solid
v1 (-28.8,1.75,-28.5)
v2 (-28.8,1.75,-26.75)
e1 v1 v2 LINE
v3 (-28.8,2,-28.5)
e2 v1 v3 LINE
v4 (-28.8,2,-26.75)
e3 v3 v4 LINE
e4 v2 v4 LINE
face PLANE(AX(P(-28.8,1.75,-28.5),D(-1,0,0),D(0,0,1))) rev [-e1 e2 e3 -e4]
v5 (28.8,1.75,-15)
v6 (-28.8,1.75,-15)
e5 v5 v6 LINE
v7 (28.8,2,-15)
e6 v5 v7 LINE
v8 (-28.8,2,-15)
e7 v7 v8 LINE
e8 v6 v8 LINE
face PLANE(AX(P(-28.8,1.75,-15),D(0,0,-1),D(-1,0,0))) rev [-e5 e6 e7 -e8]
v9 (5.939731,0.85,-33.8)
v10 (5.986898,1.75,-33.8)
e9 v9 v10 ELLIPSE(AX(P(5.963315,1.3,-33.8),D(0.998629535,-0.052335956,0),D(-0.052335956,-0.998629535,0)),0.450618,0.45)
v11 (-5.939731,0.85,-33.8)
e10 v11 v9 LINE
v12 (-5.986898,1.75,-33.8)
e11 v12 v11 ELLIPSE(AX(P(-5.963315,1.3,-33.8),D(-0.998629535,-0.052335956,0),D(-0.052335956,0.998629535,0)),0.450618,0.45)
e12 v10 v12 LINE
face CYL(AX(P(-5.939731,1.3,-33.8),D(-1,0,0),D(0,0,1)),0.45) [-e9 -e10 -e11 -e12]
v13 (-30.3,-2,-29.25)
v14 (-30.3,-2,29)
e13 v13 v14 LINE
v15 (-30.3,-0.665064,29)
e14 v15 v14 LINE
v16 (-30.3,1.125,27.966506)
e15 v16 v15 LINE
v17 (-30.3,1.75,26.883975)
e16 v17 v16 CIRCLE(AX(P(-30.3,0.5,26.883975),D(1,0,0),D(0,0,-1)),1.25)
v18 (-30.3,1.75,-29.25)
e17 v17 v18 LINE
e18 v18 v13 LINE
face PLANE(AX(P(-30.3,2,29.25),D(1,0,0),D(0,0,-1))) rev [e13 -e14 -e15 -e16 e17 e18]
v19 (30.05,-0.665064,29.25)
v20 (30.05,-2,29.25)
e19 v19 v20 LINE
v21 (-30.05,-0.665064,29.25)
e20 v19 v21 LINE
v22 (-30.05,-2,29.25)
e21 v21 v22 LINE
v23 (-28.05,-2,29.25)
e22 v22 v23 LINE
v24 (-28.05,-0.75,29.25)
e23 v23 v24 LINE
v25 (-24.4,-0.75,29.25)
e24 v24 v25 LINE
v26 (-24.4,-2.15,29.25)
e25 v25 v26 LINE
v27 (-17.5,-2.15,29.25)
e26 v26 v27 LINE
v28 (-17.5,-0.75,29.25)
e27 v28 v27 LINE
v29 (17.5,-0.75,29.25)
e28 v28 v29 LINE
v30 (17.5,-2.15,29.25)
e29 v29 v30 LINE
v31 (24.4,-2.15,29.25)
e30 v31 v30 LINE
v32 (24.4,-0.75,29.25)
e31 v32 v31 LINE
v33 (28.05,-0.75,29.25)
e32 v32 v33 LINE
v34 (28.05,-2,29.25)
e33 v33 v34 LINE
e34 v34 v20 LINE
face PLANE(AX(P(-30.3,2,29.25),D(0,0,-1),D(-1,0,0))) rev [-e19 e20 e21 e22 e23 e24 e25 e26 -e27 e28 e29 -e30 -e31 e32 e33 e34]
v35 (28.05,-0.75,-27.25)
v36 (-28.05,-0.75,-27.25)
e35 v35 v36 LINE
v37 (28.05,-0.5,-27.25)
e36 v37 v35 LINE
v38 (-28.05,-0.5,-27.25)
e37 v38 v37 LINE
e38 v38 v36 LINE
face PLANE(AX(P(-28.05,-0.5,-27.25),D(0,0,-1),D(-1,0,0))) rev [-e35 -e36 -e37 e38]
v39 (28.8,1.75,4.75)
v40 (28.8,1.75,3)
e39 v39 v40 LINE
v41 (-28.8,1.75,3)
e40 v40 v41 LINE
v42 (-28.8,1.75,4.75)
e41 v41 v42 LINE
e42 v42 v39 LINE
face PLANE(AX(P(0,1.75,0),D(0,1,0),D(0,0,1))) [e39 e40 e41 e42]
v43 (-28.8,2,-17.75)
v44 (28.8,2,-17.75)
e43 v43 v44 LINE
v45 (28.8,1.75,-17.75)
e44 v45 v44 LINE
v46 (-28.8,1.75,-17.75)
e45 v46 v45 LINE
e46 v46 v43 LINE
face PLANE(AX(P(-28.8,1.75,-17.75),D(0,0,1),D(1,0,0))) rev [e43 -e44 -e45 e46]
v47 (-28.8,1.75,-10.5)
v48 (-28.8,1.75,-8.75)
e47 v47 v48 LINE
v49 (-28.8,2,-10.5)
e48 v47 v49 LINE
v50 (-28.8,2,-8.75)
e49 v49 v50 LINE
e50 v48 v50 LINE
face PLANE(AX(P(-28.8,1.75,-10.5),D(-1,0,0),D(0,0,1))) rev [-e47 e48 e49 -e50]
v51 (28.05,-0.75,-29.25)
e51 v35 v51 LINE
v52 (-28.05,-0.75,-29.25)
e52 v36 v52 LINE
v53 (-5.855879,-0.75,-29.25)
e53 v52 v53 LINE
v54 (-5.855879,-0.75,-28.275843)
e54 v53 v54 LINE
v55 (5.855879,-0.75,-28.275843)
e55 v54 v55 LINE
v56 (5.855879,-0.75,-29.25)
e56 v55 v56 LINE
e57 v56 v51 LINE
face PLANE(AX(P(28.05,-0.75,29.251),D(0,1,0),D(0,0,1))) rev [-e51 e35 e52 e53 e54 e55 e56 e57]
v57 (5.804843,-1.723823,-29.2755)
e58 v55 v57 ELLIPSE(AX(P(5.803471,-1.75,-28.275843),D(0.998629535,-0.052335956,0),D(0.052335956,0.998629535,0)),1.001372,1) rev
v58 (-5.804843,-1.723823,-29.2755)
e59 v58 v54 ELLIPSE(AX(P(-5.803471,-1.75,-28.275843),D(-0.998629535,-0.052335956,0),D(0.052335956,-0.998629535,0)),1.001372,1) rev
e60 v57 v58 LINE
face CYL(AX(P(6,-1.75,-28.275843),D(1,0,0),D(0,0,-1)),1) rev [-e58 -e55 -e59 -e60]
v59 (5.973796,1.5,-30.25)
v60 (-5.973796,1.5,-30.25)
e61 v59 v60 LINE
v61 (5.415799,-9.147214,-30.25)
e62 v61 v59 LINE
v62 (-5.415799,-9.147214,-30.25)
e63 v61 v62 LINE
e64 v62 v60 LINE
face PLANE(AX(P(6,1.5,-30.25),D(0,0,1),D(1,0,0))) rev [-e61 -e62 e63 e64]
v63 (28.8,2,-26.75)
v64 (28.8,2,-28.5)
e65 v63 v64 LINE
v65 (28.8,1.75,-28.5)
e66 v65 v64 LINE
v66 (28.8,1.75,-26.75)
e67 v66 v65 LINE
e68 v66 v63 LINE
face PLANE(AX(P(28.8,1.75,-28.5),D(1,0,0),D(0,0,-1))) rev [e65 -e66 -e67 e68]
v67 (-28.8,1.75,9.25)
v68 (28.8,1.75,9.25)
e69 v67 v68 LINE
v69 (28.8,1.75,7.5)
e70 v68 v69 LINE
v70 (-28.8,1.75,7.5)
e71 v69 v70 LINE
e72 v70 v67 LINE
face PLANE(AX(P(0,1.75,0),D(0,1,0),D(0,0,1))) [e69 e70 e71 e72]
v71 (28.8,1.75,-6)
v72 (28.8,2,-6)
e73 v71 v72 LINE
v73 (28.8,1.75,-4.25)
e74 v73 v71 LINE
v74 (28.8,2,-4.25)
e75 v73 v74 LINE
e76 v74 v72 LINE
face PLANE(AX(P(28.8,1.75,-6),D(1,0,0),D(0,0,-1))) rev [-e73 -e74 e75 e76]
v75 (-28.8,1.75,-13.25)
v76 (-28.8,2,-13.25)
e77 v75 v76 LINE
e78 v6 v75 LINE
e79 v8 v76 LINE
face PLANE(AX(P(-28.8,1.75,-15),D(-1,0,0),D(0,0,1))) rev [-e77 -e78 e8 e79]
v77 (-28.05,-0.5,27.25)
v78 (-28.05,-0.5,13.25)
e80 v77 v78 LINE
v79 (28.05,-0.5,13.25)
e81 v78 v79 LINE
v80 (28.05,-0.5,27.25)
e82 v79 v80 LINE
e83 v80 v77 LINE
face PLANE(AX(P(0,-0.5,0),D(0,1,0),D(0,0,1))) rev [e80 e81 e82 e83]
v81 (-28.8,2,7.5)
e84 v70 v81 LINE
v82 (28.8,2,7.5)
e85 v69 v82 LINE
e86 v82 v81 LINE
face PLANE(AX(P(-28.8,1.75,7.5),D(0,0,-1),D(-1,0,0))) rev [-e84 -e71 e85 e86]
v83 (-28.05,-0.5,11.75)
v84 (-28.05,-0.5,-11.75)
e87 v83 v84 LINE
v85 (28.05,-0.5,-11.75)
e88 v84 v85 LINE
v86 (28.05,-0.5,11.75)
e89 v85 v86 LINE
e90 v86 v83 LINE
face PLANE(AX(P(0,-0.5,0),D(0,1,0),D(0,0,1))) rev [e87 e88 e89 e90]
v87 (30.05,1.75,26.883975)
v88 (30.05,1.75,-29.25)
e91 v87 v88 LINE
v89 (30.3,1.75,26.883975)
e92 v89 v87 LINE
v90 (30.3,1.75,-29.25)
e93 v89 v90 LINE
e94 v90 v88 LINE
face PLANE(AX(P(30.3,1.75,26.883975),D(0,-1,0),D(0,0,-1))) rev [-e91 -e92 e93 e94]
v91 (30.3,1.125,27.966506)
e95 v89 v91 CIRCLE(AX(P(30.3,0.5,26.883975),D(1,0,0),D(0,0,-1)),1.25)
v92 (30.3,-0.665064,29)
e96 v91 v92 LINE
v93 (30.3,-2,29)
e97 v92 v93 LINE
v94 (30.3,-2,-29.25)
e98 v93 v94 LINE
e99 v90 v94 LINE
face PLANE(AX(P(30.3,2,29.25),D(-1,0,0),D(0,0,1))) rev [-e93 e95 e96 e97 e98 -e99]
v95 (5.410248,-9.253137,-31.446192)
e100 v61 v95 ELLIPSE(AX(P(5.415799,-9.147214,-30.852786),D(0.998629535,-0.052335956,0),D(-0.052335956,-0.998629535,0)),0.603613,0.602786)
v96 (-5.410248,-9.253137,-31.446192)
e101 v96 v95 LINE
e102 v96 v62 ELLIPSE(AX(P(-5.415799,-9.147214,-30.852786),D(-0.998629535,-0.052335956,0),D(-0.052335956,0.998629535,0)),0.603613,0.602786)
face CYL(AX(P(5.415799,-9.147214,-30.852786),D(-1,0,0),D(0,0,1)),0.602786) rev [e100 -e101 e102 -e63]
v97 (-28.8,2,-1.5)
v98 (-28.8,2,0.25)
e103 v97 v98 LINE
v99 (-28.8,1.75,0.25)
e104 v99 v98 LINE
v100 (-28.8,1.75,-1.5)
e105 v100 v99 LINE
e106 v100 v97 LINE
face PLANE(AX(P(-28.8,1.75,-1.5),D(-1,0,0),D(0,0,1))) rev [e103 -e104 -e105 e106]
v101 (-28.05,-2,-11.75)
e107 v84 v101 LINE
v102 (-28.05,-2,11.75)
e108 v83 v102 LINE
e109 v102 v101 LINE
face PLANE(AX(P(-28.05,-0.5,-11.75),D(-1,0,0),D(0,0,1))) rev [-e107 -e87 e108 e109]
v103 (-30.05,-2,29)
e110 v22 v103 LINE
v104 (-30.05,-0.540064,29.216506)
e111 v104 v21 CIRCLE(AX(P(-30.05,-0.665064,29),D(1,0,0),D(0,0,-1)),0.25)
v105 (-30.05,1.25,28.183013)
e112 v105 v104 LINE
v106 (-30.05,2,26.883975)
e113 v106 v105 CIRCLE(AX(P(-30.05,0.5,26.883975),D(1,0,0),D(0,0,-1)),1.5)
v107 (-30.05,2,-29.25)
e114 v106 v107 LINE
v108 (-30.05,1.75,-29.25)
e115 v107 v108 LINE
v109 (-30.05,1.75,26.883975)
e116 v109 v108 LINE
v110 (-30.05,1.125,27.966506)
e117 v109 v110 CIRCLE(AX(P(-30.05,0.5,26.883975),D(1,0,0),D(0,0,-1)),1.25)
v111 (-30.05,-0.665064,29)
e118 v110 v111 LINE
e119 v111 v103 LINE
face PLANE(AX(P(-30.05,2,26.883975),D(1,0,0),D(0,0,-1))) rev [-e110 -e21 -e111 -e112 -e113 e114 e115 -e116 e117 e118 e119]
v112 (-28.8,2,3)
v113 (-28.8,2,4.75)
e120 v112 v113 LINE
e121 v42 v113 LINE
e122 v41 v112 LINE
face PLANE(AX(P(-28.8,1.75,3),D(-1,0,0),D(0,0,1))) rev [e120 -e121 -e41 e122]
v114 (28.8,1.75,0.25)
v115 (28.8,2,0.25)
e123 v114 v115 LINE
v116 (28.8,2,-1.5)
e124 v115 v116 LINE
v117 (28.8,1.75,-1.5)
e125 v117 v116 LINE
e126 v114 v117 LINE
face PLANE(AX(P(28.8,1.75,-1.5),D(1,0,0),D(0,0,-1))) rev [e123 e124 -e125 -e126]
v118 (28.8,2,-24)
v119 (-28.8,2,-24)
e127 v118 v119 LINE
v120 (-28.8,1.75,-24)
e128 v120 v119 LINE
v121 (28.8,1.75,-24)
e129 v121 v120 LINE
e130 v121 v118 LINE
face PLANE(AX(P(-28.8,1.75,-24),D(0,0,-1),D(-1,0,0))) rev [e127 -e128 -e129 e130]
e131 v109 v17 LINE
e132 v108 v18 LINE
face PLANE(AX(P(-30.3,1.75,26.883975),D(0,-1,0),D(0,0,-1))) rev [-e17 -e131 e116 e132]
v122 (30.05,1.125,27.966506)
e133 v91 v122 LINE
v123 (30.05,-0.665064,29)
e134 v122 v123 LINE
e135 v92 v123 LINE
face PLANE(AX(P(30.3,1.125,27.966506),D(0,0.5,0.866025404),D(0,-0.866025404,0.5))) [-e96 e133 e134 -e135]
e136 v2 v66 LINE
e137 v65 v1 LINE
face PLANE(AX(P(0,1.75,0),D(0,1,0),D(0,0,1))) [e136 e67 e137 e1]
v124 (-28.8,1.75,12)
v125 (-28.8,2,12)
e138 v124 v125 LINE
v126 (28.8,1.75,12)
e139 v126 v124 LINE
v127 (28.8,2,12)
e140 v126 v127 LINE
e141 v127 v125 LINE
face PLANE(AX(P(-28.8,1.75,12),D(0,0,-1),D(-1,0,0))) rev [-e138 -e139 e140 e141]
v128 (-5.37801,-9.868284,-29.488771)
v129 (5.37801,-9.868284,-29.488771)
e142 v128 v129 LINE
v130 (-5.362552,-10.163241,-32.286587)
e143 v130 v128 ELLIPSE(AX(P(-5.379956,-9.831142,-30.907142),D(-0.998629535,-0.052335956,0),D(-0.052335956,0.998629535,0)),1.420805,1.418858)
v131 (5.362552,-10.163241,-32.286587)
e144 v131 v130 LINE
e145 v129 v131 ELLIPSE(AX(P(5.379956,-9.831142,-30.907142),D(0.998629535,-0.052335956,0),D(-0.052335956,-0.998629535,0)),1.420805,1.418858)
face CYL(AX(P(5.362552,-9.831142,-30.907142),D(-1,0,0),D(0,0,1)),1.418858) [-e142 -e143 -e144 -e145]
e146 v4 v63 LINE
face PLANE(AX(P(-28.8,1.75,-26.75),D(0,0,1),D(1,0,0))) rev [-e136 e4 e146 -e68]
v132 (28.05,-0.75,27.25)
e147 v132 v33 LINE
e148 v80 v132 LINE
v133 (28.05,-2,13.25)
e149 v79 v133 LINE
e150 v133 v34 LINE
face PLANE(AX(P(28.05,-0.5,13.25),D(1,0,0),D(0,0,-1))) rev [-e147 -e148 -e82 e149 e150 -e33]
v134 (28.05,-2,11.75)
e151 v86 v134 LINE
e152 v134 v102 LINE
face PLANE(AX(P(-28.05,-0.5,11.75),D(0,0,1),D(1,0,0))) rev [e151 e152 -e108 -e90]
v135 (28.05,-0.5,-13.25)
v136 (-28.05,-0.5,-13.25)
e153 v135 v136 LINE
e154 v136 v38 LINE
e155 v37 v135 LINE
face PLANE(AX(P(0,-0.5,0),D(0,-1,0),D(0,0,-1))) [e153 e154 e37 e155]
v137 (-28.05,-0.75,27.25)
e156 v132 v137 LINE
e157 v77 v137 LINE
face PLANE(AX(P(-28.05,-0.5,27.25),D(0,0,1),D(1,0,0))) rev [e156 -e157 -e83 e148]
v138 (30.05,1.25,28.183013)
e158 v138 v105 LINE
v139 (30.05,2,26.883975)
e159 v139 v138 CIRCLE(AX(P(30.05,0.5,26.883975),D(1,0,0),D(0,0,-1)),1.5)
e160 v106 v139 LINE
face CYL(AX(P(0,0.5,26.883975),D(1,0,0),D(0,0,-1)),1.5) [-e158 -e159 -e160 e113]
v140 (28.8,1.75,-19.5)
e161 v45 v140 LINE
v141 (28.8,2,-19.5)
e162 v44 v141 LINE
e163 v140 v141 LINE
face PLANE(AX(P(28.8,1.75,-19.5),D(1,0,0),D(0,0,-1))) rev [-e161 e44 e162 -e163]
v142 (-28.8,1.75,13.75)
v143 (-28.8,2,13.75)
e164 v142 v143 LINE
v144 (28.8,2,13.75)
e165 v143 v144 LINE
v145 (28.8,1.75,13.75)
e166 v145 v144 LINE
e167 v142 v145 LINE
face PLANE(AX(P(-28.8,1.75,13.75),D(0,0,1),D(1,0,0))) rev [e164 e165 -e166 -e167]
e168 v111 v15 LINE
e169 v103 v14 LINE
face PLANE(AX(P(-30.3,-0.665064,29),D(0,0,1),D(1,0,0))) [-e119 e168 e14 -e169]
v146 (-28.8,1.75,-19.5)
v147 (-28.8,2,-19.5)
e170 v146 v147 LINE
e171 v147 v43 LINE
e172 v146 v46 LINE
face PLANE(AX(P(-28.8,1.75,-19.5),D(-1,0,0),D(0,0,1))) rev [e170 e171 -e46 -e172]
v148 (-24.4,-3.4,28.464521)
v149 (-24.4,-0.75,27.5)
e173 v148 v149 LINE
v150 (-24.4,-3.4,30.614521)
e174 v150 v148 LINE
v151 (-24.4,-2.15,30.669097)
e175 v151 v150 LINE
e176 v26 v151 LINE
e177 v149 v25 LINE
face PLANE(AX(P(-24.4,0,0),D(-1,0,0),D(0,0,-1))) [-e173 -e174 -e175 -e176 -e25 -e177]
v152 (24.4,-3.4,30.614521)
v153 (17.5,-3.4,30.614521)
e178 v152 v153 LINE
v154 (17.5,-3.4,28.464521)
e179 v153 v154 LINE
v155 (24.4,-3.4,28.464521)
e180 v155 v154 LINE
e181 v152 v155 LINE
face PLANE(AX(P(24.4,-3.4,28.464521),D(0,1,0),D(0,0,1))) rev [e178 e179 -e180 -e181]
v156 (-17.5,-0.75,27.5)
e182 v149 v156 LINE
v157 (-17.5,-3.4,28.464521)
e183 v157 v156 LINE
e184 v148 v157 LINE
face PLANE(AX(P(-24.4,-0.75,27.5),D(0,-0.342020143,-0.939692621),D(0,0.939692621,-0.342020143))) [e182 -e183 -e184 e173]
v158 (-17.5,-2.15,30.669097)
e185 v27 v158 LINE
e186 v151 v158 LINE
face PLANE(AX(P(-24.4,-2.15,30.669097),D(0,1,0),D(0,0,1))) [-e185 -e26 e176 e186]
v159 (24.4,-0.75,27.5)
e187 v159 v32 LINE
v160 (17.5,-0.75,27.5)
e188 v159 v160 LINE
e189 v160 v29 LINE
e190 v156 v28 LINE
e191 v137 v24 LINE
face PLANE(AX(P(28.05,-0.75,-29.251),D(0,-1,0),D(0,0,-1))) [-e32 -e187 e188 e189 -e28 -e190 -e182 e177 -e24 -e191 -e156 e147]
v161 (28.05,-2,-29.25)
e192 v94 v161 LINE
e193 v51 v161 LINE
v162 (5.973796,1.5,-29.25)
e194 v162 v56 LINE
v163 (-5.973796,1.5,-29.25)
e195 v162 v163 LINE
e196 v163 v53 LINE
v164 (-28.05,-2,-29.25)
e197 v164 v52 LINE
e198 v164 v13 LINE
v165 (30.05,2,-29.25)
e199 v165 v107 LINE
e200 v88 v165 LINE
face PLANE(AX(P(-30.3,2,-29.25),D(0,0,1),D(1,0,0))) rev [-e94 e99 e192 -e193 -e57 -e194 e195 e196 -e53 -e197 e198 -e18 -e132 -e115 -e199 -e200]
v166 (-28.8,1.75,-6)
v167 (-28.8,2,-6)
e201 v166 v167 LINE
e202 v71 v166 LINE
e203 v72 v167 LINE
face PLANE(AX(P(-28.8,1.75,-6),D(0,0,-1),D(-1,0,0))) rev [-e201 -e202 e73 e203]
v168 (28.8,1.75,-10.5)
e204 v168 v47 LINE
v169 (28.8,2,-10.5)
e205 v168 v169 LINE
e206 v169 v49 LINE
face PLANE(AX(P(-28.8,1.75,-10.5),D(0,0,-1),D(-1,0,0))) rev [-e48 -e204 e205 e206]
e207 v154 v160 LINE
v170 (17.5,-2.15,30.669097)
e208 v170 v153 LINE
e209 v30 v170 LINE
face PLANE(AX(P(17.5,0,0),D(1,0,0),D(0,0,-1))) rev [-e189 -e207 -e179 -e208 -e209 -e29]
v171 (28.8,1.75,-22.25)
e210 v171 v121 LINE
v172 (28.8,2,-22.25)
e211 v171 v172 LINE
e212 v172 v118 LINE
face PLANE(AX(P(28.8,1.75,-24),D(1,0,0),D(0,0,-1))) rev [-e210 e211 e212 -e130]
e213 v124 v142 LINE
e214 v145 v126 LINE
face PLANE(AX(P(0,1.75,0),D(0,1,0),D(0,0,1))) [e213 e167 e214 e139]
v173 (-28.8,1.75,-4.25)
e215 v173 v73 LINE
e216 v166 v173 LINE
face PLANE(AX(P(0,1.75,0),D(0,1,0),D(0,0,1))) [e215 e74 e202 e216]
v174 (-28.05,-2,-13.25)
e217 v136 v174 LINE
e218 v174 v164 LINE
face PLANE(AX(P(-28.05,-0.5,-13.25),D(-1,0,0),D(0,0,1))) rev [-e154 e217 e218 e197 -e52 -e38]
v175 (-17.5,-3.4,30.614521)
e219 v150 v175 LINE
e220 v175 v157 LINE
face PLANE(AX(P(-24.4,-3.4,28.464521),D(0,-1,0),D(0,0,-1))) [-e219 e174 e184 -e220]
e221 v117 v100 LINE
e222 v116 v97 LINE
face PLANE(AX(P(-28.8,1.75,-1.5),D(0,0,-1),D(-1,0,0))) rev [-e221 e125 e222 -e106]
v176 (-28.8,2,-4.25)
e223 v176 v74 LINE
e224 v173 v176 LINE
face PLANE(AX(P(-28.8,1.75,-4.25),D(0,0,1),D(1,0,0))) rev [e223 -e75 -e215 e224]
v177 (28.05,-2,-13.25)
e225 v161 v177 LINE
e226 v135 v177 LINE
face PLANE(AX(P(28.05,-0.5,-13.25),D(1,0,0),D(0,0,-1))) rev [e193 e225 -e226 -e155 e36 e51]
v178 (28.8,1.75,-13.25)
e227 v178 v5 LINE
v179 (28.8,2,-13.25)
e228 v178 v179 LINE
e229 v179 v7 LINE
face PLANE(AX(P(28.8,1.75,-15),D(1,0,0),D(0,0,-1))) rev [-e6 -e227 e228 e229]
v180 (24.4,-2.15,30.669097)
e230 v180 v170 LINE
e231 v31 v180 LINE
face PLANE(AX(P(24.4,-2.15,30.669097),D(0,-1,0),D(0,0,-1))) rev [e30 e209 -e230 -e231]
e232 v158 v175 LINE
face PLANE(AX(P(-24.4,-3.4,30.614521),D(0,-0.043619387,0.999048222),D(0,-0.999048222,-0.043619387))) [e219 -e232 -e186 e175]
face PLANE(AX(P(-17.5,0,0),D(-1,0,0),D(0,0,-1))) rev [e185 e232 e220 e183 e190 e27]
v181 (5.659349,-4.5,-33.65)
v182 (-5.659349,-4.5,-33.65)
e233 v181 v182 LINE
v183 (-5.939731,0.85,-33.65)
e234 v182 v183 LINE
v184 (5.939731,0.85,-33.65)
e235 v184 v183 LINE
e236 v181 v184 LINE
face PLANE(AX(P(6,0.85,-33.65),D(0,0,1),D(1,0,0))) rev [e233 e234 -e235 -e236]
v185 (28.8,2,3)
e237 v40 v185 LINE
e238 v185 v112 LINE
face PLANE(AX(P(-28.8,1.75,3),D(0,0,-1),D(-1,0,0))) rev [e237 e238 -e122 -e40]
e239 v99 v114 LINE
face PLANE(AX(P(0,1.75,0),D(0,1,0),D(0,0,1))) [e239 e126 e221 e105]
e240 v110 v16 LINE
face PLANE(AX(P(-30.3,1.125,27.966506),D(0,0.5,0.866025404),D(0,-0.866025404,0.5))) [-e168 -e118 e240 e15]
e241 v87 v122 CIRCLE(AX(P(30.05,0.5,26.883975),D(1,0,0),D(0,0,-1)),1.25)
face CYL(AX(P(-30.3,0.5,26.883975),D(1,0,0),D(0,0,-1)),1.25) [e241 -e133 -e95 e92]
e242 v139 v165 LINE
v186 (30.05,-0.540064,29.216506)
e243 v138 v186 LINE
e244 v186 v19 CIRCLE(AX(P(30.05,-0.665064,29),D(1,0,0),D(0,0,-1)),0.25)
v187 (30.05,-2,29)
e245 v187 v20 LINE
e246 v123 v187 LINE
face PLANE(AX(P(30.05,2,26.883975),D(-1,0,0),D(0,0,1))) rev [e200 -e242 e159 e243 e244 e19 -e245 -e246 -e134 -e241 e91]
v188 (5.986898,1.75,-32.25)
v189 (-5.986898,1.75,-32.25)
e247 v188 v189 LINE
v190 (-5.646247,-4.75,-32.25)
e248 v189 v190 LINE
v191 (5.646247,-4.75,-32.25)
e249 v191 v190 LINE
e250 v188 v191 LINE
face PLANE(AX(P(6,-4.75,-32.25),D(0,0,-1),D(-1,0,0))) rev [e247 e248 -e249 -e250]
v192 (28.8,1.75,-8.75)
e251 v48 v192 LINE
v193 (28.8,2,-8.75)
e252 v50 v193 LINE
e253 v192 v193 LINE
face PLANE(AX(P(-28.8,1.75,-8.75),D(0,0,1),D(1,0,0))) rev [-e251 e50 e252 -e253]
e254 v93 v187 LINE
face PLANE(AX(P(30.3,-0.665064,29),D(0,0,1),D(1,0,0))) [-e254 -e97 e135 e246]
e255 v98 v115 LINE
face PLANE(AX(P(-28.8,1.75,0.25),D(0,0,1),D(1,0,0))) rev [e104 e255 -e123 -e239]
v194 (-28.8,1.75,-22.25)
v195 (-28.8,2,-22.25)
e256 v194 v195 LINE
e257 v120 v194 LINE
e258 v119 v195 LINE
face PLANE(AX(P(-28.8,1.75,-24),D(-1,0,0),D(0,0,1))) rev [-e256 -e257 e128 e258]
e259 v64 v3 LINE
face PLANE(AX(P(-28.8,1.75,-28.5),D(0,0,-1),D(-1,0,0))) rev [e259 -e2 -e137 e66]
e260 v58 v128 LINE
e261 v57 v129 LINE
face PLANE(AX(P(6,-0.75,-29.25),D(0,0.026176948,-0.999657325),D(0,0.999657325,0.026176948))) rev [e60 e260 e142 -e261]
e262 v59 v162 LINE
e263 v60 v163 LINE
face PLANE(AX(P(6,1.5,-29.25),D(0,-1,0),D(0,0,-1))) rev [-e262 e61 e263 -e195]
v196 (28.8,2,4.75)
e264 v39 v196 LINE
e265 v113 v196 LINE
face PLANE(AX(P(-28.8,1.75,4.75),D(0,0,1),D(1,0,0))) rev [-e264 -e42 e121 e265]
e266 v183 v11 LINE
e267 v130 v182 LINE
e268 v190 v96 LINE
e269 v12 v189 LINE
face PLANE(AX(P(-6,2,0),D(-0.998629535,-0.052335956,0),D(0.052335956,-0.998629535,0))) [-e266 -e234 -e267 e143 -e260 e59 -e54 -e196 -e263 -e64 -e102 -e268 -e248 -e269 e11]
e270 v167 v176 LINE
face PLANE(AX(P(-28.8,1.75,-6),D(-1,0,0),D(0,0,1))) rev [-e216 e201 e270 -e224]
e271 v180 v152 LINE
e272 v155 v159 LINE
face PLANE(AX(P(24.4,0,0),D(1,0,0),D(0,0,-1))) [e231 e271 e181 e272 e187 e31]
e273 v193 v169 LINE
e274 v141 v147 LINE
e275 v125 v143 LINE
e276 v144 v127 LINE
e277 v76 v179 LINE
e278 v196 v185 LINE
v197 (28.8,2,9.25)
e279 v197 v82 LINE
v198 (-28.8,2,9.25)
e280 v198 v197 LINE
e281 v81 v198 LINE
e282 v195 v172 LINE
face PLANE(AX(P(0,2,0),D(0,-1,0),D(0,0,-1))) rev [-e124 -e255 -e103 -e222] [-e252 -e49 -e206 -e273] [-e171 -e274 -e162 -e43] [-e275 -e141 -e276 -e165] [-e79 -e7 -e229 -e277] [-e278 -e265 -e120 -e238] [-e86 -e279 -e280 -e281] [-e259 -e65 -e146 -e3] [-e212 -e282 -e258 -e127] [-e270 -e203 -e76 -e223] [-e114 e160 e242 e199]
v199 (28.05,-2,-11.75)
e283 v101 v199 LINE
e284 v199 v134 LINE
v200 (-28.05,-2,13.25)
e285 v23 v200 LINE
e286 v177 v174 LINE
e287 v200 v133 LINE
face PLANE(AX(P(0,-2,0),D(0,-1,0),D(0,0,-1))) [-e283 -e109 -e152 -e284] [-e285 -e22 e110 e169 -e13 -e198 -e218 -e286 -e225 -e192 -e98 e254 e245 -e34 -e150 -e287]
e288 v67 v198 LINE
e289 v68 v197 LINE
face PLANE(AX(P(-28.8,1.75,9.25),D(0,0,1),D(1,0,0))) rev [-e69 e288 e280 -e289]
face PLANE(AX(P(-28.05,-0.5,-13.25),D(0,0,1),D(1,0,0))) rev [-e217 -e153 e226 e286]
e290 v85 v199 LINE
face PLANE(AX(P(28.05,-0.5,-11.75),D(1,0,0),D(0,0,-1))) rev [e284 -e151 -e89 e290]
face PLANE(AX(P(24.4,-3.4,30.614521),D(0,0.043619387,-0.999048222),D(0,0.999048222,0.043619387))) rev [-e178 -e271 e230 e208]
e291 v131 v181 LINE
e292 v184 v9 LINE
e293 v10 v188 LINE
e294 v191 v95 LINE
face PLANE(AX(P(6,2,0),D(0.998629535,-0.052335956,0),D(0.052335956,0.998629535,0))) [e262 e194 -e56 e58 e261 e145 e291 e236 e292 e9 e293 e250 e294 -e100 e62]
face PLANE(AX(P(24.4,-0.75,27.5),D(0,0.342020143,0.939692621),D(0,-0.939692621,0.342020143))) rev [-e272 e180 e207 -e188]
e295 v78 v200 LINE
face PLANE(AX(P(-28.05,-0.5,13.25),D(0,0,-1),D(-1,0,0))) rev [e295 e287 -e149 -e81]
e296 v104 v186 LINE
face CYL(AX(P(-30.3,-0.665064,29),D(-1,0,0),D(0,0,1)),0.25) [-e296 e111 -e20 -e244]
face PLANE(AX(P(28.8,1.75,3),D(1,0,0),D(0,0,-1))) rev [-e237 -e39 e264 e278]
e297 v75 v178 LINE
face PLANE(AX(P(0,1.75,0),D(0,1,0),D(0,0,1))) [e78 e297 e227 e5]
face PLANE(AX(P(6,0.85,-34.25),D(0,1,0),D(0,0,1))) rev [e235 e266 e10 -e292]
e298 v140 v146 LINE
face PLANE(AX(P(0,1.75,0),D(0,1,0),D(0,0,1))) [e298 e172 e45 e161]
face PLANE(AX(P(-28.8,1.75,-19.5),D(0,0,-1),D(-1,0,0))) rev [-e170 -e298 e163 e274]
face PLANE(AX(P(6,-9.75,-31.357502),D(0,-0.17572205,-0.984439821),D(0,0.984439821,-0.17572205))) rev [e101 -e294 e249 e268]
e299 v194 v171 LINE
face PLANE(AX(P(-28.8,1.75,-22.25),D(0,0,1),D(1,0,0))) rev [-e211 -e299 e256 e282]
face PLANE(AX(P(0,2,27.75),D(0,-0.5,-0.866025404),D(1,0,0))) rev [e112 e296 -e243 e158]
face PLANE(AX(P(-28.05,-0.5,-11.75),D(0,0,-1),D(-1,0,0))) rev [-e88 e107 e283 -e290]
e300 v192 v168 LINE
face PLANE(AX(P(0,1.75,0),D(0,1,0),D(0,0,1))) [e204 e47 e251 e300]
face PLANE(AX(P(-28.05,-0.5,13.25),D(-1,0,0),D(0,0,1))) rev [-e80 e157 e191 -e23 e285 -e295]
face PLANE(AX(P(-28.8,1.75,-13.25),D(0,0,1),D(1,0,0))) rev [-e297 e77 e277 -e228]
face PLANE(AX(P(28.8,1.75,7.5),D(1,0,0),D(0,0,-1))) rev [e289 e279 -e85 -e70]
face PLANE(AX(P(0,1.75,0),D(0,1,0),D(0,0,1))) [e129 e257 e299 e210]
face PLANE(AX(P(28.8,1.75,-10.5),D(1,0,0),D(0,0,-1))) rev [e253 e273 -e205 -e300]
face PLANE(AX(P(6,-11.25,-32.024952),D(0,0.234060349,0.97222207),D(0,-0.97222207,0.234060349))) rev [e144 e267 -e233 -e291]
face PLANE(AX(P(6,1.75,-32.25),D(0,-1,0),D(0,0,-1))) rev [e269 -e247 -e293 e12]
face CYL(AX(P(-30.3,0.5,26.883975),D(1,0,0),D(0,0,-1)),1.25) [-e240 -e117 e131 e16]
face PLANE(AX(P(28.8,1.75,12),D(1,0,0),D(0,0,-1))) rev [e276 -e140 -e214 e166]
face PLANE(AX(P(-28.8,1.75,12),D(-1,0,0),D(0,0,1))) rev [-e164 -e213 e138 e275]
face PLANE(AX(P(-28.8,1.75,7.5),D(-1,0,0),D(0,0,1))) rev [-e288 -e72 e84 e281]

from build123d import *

# Parameters (mm, degrees)
SKETCH1_W           = 60.6
SKETCH1_H           = 58.5
BOSS_EXTRUDE1_DEPTH = 2
SKETCH2_W           = 56.1
SKETCH2_H           = 23.5
SKETCH2_H_2         = 14
CUT_EXTRUDE1_DEPTH  = 1.5
CUT_EXTRUDE2_REACH  = 67.912
SKETCH3_W           = 56.1
SKETCH3_H           = 1.25
BOSS_EXTRUDE2_START = 17.5
BOSS_EXTRUDE2_DEPTH = 6.9
BOSS_EXTRUDE3_DEPTH = 6
DRAFT1_START        = -35
DRAFT1_DEPTH        = 5.75
FILLET1_R           = 0.45
FILLET2_R           = 0.602786
FILLET3_R           = 1.418858
FILLET4_R           = 1
SKETCH6_W           = 57.6
SKETCH6_H           = 1.75
CUT_EXTRUDE3_DEPTH  = 0.25
CHAMFER1_START      = 25.032204955
CHAMFER1_OUTLINE_W  = 60.6
CHAMFER1_OUTLINE_H  = 3
CHAMFER1_DEPTH      = 1.967795045
FILLET5_START       = -31
FILLET5_DEPTH       = 62
FILLET6_R           = 0.25
CUT_SWEEP1_START    = -31
CUT_SWEEP1_DEPTH    = 0.95
CUT_SWEEP1_START_2  = 30.05
CUT_SWEEP1_2_DEPTH  = 0.95


with BuildPart() as part:
    # Sketch1 → Boss-Extrude1 (new, symmetric)
    with BuildSketch(Plane(origin=(0, 0, 0), x_dir=(1, 0, 0), z_dir=(0, 1, 0))):
        Rectangle(SKETCH1_W, SKETCH1_H)
    extrude(amount=BOSS_EXTRUDE1_DEPTH, both=True)

    # Sketch2 → Cut-Extrude1 (cut)
    with BuildSketch(Plane.XZ.offset(2)):
        Rectangle(SKETCH2_W, SKETCH2_H)
        with Locations((0, 20.25)):
            Rectangle(SKETCH2_W, SKETCH2_H_2)
        with Locations((0, -20.25)):
            Rectangle(SKETCH2_W, SKETCH2_H_2)
    extrude(amount=-CUT_EXTRUDE1_DEPTH, mode=Mode.SUBTRACT)

    # Sketch3 → Cut-Extrude2 (cut, up to next)
    with BuildSketch(Plane(origin=(0, 0, -29.25), x_dir=(-1, 0, 0), z_dir=(0, 0, -1)), mode=Mode.PRIVATE) as cut_extrude2_sk1:
        with Locations((0, -1.375)):
            Rectangle(SKETCH3_W, SKETCH3_H)
    cut_extrude2_tool1 = extrude(cut_extrude2_sk1.sketch, amount=-CUT_EXTRUDE2_REACH, mode=Mode.PRIVATE) & part.part
    cut_extrude2 = cut_extrude2_tool1.solids().sort_by_distance((0, -1.375, -29.25))[0]
    add(cut_extrude2, mode=Mode.SUBTRACT)

    # Mirror1: Cut-Extrude2 across plane
    add(cut_extrude2.mirror(Plane.XY), mode=Mode.SUBTRACT)

    # Boss-Extrude2: read off the stored shape, not the designer's step
    # Boss-Extrude2 outline → Boss-Extrude2 (add)
    with BuildSketch(Plane.YZ.offset(BOSS_EXTRUDE2_START)):
        Polygon((-0.75, 29.25), (-2.15, 29.25), (-2.15, 30.669097299), (-3.4, 30.614521121), (-3.4, 28.464521121), (-0.75, 27.5), align=None)
    boss_extrude2 = extrude(amount=BOSS_EXTRUDE2_DEPTH)

    # Sketch5 → Boss-Extrude3 (add, symmetric)
    with BuildSketch(Plane(origin=(0, 0, 0), x_dir=(0, 0, -1), z_dir=(1, 0, 0))):
        Polygon((29.25, 1.5), (30.25, 1.5), (30.25, -9.75), (31.357502325, -9.75), (32.25, -4.75), (32.25, 1.75), (34.25, 1.75), (34.25, 0.85), (33.65, 0.85), (33.65, -4.5), (32.024952176, -11.25), (29.524952176, -11.25), (29.25, -0.75), align=None)
    extrude(amount=BOSS_EXTRUDE3_DEPTH, both=True)

    # Draft1: read off the stored shape, not the designer's step
    # Draft1 outline → Draft1 (cut)
    with BuildSketch(Plane.XY.offset(DRAFT1_START)):
        Polygon((5.305596924, -11.25), (6, -11.25), (6, 1.75), (5.986898055, 1.75), align=None)
        Polygon((-6, -11.25), (-5.305596924, -11.25), (-5.986898055, 1.75), (-6, 1.75), align=None)
    extrude(amount=DRAFT1_DEPTH, mode=Mode.SUBTRACT)

    # Fillet1
    fillet1_edges = [part.edges().sort_by_distance(p)[0] for p in [
        (0, 0.85, -34.25),
        (0, 1.75, -34.25),
    ]]
    fillet(fillet1_edges, radius=FILLET1_R - 0.0001)  # a hair under: the kernel refuses the full size

    # Fillet2
    fillet2_edges = [part.edges().sort_by_distance(p)[0] for p in [
        (0, -9.75, -31.357502325),
        (0, -9.75, -30.25),
    ]]
    fillet(fillet2_edges, radius=FILLET2_R - 0.0001)  # a hair under: the kernel refuses the full size

    # Fillet3
    fillet3_edges = [part.edges().sort_by_distance(p)[0] for p in [
        (0, -11.25, -29.524952176),
        (0, -11.25, -32.024952176),
    ]]
    fillet(fillet3_edges, radius=FILLET3_R - 0.0001)  # a hair under: the kernel refuses the full size

    # Fillet4
    fillet4_edges = [part.edges().sort_by_distance(p)[0] for p in [
        (0, -0.75, -29.25),
    ]]
    fillet(fillet4_edges, radius=FILLET4_R)

    # Sketch6 → Cut-Extrude3 (cut)
    with BuildSketch(Plane(origin=(0, 2, 0), x_dir=(1, 0, 0), z_dir=(0, 1, 0))):
        with Locations((0, 27.625)):
            Rectangle(SKETCH6_W, SKETCH6_H)
        with Locations((0, 23.125)):
            Rectangle(SKETCH6_W, SKETCH6_H)
        with Locations((0, 18.625)):
            Rectangle(SKETCH6_W, SKETCH6_H)
        with Locations((0, 14.125)):
            Rectangle(SKETCH6_W, SKETCH6_H)
        with Locations((0, 9.625)):
            Rectangle(SKETCH6_W, SKETCH6_H)
        with Locations((0, 5.125)):
            Rectangle(SKETCH6_W, SKETCH6_H)
        with Locations((0, 0.625)):
            Rectangle(SKETCH6_W, SKETCH6_H)
        with Locations((0, -3.875)):
            Rectangle(SKETCH6_W, SKETCH6_H)
        with Locations((0, -8.375)):
            Rectangle(SKETCH6_W, SKETCH6_H)
        with Locations((0, -12.875)):
            Rectangle(SKETCH6_W, SKETCH6_H)
    extrude(amount=-CUT_EXTRUDE3_DEPTH, mode=Mode.SUBTRACT)

    # Chamfer1: read off the stored shape, not the designer's step
    # Chamfer1 outline → Chamfer1 (cut)
    with BuildSketch(Plane(origin=(0, 0, 0), x_dir=(1, 0, 0), z_dir=(0, 0.500000000000001, 0.866025403784438)).offset(CHAMFER1_START)):
        with Locations((0, -13.642949192)):
            Rectangle(CHAMFER1_OUTLINE_W, CHAMFER1_OUTLINE_H)
    extrude(amount=CHAMFER1_DEPTH, mode=Mode.SUBTRACT)

    # Fillet5: read off the stored shape, not the designer's step
    # Fillet5 outline → Fillet5 (cut)
    with BuildSketch(Plane.YZ.offset(FILLET5_START)):
        with BuildLine():
            ThreePointArc((1.25, 28.183012702), (1.799038106, 27.633974596), (2, 26.883974596))
            Line((2, 26.883974596), (2, 27.75))
            Line((2, 27.75), (1.25, 28.183012702))
        make_face()
    extrude(amount=FILLET5_DEPTH, mode=Mode.SUBTRACT)

    # Fillet6
    fillet6_edges = [part.edges().sort_by_distance(p)[0] for p in [
        (0, -0.598076211, 29.25),
    ]]
    fillet(fillet6_edges, radius=FILLET6_R)

    # Cut-Sweep1: read off the stored shape, not the designer's step
    # Cut-Sweep1 outline → Cut-Sweep1 (cut)
    with BuildSketch(Plane.YZ.offset(CUT_SWEEP1_START)):
        with BuildLine():
            ThreePointArc((1.125, 27.966506351), (1.582531755, 27.508974596), (1.75, 26.883974596))
            Line((1.75, 26.883974596), (1.75, -29.25))
            Line((1.75, -29.25), (2, -29.25))
            Line((2, -29.25), (2, 26.883974596))
            ThreePointArc((2, 26.883974596), (1.799038106, 27.633974596), (1.25, 28.183012702))
            Line((1.25, 28.183012702), (-0.540063509, 29.216506351))
            ThreePointArc((-0.540063509, 29.216506351), (-0.600358748, 29.241481457), (-0.665063509, 29.25))
            Line((-0.665063509, 29.25), (-2, 29.25))
            Line((-2, 29.25), (-2, 29))
            Line((-2, 29), (-0.665063509, 29))
            Line((-0.665063509, 29), (1.125, 27.966506351))
        make_face()
    extrude(amount=CUT_SWEEP1_DEPTH, mode=Mode.SUBTRACT)

    # Cut-Sweep1 2 outline → Cut-Sweep1 2 (cut)
    with BuildSketch(Plane.YZ.offset(CUT_SWEEP1_START_2)):
        with BuildLine():
            ThreePointArc((1.125, 27.966506351), (1.582531755, 27.508974596), (1.75, 26.883974596))
            Line((1.75, 26.883974596), (1.75, -29.25))
            Line((1.75, -29.25), (2, -29.25))
            Line((2, -29.25), (2, 26.883974596))
            ThreePointArc((2, 26.883974596), (1.799038106, 27.633974596), (1.25, 28.183012702))
            Line((1.25, 28.183012702), (-0.540063509, 29.216506351))
            ThreePointArc((-0.540063509, 29.216506351), (-0.600358748, 29.241481457), (-0.665063509, 29.25))
            Line((-0.665063509, 29.25), (-2, 29.25))
            Line((-2, 29.25), (-2, 29))
            Line((-2, 29), (-0.665063509, 29))
            Line((-0.665063509, 29), (1.125, 27.966506351))
        make_face()
    extrude(amount=CUT_SWEEP1_2_DEPTH, mode=Mode.SUBTRACT)

    # Mirror2: Boss-Extrude2 across plane
    add(boss_extrude2.mirror(Plane(origin=(0, 0, 0), x_dir=(0, 0, 1), z_dir=(1, 0, 0))))


solid = part.part
